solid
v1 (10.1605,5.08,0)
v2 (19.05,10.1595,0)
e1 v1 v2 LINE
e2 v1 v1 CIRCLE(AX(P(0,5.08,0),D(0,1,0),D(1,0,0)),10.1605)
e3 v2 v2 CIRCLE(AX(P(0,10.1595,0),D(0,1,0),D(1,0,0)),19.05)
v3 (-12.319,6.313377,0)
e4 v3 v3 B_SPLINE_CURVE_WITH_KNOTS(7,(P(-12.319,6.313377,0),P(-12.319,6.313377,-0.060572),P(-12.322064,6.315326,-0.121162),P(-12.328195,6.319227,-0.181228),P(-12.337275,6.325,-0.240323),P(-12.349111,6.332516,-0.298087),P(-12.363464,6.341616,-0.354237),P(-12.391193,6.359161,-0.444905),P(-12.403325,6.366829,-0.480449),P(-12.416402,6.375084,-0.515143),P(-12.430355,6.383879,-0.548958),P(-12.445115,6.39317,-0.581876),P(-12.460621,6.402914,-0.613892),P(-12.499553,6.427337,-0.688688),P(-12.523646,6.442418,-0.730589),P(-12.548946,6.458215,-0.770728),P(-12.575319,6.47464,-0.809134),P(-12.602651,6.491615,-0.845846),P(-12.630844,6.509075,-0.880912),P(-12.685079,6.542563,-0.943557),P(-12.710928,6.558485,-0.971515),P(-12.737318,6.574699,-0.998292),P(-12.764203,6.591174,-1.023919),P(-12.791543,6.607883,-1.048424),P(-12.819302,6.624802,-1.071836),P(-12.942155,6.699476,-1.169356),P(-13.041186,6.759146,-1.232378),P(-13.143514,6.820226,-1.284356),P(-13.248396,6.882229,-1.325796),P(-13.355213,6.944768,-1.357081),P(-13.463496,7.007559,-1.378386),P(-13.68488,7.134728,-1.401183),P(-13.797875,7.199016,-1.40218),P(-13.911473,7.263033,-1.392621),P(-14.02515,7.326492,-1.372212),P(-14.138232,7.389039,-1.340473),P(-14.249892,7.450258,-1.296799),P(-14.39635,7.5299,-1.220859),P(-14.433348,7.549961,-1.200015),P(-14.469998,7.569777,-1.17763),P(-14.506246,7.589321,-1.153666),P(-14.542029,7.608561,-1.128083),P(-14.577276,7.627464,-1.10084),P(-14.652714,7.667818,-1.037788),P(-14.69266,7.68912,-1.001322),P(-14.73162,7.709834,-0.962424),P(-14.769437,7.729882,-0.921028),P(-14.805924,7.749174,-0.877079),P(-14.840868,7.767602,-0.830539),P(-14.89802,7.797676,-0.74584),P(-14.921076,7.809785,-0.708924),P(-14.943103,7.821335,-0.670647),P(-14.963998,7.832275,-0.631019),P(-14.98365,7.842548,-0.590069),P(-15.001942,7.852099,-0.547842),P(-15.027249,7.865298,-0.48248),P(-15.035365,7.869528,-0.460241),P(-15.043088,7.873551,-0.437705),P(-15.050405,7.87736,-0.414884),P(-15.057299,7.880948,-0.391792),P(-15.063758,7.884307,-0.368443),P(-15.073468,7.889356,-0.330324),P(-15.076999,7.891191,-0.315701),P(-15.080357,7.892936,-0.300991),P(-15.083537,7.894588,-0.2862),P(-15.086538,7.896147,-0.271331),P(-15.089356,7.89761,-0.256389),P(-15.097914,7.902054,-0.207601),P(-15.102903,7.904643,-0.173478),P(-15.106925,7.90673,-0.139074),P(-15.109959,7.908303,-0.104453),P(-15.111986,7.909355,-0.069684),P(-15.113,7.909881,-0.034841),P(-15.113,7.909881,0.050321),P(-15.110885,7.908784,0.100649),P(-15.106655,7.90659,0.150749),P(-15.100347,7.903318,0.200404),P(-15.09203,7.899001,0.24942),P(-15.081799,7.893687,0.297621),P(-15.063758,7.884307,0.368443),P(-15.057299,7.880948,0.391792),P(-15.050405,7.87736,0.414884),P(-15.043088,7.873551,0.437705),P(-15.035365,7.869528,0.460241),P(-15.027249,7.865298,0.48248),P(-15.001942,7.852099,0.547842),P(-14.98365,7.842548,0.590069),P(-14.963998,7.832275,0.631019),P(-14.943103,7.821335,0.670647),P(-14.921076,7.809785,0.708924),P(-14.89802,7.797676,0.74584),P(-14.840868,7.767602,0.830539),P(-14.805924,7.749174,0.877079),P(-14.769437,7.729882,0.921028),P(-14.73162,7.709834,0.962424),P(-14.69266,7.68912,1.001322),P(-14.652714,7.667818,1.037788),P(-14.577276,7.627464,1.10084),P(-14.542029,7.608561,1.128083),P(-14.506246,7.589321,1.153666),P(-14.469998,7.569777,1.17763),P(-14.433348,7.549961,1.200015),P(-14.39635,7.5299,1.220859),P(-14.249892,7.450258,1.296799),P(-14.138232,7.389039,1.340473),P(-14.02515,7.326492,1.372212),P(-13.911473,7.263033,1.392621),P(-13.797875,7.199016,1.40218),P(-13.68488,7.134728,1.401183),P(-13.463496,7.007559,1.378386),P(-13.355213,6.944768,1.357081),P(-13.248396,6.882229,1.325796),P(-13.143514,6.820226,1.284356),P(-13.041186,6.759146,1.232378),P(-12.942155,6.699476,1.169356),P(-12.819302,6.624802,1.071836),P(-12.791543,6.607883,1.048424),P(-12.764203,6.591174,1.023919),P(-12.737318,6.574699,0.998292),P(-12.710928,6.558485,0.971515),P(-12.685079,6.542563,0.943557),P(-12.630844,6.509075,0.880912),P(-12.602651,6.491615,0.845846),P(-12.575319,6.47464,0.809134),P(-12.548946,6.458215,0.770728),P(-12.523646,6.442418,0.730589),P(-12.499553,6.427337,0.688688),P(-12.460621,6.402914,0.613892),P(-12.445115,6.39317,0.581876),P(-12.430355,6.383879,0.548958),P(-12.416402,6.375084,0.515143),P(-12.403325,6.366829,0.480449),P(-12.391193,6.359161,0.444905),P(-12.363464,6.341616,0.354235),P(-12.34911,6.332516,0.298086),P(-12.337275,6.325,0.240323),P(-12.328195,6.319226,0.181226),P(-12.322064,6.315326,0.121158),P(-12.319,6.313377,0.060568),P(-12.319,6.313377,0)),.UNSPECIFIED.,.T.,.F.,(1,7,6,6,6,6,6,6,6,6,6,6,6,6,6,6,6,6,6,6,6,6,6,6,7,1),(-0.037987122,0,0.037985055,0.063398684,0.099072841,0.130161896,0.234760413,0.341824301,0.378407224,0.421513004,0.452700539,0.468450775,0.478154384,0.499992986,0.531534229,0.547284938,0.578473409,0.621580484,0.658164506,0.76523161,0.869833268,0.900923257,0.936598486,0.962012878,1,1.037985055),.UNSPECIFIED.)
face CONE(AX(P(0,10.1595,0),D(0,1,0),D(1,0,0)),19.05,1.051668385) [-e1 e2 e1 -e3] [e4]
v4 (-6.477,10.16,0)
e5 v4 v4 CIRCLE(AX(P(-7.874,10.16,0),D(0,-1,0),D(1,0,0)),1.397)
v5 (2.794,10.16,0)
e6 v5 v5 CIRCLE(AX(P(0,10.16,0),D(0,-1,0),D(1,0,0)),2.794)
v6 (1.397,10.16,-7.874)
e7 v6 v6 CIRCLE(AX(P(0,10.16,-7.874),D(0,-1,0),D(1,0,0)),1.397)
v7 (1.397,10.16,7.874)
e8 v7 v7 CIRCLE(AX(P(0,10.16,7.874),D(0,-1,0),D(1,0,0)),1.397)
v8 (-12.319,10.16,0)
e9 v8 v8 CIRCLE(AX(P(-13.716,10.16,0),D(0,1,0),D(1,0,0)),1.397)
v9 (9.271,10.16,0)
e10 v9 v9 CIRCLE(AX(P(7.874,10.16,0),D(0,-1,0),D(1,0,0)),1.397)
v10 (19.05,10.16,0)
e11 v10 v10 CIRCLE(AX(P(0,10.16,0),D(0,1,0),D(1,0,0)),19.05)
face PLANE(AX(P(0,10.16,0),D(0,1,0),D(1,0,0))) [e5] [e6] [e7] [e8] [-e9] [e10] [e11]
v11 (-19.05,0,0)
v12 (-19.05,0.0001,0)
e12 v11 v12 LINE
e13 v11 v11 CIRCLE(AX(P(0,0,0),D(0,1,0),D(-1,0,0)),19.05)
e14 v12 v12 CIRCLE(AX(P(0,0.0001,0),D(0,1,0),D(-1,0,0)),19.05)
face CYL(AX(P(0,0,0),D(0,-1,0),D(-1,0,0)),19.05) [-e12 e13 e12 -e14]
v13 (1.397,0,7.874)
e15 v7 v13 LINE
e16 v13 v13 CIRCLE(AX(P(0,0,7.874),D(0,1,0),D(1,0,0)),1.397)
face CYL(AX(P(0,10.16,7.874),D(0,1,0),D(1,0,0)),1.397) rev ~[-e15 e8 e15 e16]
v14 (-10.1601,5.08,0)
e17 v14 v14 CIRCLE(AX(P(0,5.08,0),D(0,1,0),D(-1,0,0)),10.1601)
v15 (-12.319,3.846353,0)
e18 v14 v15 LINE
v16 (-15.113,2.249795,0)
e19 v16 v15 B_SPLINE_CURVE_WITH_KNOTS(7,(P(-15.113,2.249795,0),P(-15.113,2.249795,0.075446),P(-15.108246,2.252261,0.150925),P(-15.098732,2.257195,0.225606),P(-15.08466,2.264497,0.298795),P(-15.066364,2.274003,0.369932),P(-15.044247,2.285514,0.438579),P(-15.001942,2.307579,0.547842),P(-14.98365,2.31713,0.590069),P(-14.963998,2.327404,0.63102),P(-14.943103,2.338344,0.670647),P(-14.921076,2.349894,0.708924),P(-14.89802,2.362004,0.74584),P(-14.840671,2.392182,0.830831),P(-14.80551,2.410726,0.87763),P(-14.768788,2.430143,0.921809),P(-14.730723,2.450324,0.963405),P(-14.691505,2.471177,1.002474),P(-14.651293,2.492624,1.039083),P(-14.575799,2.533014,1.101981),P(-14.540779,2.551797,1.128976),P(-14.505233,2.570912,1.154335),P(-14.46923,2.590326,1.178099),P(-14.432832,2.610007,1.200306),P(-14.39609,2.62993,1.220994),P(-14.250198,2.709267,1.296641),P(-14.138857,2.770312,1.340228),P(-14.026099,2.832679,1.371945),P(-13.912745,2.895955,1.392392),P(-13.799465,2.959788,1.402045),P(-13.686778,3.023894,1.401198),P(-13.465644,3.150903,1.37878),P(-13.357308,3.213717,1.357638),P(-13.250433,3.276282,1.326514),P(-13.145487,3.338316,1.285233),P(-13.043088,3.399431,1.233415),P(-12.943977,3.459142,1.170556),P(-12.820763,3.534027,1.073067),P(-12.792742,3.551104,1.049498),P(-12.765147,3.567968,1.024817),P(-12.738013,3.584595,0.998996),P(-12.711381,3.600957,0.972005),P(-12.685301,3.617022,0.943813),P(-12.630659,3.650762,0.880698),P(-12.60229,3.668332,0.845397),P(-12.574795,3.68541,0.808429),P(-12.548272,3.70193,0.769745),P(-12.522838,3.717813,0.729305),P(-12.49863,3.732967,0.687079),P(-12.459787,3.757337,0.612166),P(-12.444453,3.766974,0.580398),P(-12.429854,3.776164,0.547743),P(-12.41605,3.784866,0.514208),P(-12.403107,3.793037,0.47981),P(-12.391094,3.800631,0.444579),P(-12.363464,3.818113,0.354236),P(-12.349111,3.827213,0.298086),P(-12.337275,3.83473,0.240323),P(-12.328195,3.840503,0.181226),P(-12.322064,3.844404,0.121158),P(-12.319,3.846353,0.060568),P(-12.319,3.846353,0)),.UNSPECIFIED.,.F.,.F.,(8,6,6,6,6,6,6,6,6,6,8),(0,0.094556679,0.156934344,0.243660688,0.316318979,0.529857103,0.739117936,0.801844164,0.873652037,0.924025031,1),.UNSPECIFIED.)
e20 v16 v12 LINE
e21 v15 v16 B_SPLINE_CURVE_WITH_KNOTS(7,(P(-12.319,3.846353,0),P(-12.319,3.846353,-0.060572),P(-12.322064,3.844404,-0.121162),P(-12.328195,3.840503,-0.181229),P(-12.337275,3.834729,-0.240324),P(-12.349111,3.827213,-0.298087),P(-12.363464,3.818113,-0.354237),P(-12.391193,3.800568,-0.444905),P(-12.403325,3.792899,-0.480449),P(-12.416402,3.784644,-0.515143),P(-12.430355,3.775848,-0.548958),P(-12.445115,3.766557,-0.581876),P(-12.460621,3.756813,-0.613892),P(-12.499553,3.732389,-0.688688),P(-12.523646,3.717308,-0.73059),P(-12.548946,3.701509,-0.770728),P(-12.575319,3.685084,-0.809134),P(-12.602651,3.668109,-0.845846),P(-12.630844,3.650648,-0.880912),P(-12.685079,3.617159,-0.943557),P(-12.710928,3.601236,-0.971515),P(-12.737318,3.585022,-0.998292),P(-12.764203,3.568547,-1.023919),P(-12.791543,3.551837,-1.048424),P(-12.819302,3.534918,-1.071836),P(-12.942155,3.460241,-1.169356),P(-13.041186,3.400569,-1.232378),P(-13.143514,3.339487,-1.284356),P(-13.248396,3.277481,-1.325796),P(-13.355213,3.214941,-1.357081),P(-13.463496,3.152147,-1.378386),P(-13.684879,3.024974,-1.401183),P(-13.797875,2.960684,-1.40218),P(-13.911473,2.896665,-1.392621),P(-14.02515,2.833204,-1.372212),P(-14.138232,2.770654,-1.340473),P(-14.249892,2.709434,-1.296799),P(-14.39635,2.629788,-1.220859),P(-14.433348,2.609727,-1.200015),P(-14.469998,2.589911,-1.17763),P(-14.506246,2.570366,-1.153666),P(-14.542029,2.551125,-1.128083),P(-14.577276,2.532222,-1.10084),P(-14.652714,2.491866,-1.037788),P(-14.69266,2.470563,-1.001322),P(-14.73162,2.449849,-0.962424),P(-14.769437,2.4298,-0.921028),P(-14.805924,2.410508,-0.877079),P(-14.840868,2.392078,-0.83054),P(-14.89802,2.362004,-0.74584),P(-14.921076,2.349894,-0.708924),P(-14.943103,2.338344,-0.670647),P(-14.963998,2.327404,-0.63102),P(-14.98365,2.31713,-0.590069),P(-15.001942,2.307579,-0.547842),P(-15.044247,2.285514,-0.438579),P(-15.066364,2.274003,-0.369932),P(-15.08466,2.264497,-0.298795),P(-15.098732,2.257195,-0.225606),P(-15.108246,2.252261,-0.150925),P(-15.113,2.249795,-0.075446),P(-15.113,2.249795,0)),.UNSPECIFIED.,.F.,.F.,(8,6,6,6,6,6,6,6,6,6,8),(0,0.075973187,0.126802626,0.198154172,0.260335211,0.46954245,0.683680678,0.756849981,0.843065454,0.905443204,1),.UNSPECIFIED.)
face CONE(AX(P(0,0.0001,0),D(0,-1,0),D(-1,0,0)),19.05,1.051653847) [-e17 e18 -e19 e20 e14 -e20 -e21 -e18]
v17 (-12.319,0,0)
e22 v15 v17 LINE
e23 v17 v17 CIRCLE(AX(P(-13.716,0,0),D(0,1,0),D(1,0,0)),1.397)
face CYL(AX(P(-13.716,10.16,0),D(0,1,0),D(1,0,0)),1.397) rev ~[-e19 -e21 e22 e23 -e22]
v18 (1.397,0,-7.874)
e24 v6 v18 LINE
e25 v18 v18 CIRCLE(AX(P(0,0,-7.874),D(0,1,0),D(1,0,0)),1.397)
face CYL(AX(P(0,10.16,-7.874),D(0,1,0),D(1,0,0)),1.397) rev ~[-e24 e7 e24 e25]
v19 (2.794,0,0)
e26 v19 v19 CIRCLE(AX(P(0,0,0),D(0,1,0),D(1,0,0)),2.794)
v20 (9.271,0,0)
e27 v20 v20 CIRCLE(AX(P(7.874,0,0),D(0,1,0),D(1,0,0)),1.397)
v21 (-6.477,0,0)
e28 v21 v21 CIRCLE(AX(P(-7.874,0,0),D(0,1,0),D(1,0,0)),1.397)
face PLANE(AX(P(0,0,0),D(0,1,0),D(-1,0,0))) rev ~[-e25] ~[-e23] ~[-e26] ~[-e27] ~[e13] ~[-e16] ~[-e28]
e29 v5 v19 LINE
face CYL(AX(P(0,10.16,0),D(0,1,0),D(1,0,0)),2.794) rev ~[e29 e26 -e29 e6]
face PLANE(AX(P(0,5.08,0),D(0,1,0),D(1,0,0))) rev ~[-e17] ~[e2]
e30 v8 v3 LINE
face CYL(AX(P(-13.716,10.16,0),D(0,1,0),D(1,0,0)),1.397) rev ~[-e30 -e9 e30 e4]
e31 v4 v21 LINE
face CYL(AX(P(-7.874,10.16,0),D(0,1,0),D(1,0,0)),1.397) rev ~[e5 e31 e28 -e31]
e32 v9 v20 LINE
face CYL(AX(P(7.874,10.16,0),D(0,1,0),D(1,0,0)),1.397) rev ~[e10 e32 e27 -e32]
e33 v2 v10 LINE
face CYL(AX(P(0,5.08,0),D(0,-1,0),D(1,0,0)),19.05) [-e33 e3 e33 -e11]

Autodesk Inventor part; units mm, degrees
ref_plane "YZ Plane" through (0, 0, 0) normal (1, 0, 0) x (0, 1, 0)
ref_plane "XZ Plane" through (0, 0, 0) normal (0, 1, 0) x (-1, 0, 0)
ref_plane "XY Plane" through (0, 0, 0) normal (0, 0, 1) x (1, 0, 0)
sketch "Sketch1" plane through (0, 0, 0) normal (0, 1, 0) x (-1, 0, 0)
  circle A0 centre (0, 0) radius 19.05
  dimension "d0" = 38.1
extrude "Extrusion1" add sketch "Sketch1" along normal blind 5.08
chamfer "Chamfer1" distance 8.89 distance2 5.08 1 edges at (19.05, 5.08, 0) measured on face at (-1.662, 5.08, -1.5197)
sketch "Sketch2" plane through (0, 5.08, 0) normal (0, 1, 0) x (1, 0, 0)
  circle A0 centre (0, 0) radius 19.05
extrude "Extrusion2" add sketch "Sketch2" along normal blind 5.08
chamfer "Chamfer2" distance 8.89 distance2 5.08 1 edges at (-19.05, 5.08, 0) measured on face at (15.8038, 5.08, 2.3301)
sketch "Sketch4" plane through (0, 10.16, 0) normal (0, 1, 0) x (1, 0, 0)
  circle A0 centre (0, 0) radius 2.794
  line L0 (0, 0) -> (-7.874, 0)
  line L1 (-7.874, 0) -> (-13.716, 0)
  line L2 (0, 0) -> (0, 7.874)
  line L3 (0, 0) -> (7.874, 0)
  line L4 (0, 0) -> (0, -7.874)
  circle A1 centre (0, -7.874) radius 1.397
  circle A2 centre (7.874, 0) radius 1.397
  circle A3 centre (0, 7.874) radius 1.397
  circle A4 centre (-7.874, 0) radius 1.397
  circle A5 centre (-13.716, 0) radius 1.397
  dimension "d28" = 5.588
  dimension "d29" = 7.874
  dimension "d30" = 5.842
  dimension "d31" = 7.874
  dimension "d32" = 7.874
  dimension "d33" = 7.874
  dimension "d34" = 2.794
  dimension "d35" = 2.794
  dimension "d36" = 2.794
  dimension "d37" = 2.794
  dimension "d38" = 2.794
  dimension "d15" = 7.874
  dimension "d16" = 5.842
  dimension "d17" = 5.588
  dimension "d18" = 2.794
  dimension "d19" = 2.794
  dimension "d20" = 7.874
  dimension "d21" = 7.874
  dimension "d22" = 7.874
  dimension "d23" = 2.794
  dimension "d24" = 2.794
  dimension "d25" = 2.794
extrude "Extrusion3" cut sketch "Sketch4" against normal blind 10.16
properties part number "LittleBigWheel v3"
